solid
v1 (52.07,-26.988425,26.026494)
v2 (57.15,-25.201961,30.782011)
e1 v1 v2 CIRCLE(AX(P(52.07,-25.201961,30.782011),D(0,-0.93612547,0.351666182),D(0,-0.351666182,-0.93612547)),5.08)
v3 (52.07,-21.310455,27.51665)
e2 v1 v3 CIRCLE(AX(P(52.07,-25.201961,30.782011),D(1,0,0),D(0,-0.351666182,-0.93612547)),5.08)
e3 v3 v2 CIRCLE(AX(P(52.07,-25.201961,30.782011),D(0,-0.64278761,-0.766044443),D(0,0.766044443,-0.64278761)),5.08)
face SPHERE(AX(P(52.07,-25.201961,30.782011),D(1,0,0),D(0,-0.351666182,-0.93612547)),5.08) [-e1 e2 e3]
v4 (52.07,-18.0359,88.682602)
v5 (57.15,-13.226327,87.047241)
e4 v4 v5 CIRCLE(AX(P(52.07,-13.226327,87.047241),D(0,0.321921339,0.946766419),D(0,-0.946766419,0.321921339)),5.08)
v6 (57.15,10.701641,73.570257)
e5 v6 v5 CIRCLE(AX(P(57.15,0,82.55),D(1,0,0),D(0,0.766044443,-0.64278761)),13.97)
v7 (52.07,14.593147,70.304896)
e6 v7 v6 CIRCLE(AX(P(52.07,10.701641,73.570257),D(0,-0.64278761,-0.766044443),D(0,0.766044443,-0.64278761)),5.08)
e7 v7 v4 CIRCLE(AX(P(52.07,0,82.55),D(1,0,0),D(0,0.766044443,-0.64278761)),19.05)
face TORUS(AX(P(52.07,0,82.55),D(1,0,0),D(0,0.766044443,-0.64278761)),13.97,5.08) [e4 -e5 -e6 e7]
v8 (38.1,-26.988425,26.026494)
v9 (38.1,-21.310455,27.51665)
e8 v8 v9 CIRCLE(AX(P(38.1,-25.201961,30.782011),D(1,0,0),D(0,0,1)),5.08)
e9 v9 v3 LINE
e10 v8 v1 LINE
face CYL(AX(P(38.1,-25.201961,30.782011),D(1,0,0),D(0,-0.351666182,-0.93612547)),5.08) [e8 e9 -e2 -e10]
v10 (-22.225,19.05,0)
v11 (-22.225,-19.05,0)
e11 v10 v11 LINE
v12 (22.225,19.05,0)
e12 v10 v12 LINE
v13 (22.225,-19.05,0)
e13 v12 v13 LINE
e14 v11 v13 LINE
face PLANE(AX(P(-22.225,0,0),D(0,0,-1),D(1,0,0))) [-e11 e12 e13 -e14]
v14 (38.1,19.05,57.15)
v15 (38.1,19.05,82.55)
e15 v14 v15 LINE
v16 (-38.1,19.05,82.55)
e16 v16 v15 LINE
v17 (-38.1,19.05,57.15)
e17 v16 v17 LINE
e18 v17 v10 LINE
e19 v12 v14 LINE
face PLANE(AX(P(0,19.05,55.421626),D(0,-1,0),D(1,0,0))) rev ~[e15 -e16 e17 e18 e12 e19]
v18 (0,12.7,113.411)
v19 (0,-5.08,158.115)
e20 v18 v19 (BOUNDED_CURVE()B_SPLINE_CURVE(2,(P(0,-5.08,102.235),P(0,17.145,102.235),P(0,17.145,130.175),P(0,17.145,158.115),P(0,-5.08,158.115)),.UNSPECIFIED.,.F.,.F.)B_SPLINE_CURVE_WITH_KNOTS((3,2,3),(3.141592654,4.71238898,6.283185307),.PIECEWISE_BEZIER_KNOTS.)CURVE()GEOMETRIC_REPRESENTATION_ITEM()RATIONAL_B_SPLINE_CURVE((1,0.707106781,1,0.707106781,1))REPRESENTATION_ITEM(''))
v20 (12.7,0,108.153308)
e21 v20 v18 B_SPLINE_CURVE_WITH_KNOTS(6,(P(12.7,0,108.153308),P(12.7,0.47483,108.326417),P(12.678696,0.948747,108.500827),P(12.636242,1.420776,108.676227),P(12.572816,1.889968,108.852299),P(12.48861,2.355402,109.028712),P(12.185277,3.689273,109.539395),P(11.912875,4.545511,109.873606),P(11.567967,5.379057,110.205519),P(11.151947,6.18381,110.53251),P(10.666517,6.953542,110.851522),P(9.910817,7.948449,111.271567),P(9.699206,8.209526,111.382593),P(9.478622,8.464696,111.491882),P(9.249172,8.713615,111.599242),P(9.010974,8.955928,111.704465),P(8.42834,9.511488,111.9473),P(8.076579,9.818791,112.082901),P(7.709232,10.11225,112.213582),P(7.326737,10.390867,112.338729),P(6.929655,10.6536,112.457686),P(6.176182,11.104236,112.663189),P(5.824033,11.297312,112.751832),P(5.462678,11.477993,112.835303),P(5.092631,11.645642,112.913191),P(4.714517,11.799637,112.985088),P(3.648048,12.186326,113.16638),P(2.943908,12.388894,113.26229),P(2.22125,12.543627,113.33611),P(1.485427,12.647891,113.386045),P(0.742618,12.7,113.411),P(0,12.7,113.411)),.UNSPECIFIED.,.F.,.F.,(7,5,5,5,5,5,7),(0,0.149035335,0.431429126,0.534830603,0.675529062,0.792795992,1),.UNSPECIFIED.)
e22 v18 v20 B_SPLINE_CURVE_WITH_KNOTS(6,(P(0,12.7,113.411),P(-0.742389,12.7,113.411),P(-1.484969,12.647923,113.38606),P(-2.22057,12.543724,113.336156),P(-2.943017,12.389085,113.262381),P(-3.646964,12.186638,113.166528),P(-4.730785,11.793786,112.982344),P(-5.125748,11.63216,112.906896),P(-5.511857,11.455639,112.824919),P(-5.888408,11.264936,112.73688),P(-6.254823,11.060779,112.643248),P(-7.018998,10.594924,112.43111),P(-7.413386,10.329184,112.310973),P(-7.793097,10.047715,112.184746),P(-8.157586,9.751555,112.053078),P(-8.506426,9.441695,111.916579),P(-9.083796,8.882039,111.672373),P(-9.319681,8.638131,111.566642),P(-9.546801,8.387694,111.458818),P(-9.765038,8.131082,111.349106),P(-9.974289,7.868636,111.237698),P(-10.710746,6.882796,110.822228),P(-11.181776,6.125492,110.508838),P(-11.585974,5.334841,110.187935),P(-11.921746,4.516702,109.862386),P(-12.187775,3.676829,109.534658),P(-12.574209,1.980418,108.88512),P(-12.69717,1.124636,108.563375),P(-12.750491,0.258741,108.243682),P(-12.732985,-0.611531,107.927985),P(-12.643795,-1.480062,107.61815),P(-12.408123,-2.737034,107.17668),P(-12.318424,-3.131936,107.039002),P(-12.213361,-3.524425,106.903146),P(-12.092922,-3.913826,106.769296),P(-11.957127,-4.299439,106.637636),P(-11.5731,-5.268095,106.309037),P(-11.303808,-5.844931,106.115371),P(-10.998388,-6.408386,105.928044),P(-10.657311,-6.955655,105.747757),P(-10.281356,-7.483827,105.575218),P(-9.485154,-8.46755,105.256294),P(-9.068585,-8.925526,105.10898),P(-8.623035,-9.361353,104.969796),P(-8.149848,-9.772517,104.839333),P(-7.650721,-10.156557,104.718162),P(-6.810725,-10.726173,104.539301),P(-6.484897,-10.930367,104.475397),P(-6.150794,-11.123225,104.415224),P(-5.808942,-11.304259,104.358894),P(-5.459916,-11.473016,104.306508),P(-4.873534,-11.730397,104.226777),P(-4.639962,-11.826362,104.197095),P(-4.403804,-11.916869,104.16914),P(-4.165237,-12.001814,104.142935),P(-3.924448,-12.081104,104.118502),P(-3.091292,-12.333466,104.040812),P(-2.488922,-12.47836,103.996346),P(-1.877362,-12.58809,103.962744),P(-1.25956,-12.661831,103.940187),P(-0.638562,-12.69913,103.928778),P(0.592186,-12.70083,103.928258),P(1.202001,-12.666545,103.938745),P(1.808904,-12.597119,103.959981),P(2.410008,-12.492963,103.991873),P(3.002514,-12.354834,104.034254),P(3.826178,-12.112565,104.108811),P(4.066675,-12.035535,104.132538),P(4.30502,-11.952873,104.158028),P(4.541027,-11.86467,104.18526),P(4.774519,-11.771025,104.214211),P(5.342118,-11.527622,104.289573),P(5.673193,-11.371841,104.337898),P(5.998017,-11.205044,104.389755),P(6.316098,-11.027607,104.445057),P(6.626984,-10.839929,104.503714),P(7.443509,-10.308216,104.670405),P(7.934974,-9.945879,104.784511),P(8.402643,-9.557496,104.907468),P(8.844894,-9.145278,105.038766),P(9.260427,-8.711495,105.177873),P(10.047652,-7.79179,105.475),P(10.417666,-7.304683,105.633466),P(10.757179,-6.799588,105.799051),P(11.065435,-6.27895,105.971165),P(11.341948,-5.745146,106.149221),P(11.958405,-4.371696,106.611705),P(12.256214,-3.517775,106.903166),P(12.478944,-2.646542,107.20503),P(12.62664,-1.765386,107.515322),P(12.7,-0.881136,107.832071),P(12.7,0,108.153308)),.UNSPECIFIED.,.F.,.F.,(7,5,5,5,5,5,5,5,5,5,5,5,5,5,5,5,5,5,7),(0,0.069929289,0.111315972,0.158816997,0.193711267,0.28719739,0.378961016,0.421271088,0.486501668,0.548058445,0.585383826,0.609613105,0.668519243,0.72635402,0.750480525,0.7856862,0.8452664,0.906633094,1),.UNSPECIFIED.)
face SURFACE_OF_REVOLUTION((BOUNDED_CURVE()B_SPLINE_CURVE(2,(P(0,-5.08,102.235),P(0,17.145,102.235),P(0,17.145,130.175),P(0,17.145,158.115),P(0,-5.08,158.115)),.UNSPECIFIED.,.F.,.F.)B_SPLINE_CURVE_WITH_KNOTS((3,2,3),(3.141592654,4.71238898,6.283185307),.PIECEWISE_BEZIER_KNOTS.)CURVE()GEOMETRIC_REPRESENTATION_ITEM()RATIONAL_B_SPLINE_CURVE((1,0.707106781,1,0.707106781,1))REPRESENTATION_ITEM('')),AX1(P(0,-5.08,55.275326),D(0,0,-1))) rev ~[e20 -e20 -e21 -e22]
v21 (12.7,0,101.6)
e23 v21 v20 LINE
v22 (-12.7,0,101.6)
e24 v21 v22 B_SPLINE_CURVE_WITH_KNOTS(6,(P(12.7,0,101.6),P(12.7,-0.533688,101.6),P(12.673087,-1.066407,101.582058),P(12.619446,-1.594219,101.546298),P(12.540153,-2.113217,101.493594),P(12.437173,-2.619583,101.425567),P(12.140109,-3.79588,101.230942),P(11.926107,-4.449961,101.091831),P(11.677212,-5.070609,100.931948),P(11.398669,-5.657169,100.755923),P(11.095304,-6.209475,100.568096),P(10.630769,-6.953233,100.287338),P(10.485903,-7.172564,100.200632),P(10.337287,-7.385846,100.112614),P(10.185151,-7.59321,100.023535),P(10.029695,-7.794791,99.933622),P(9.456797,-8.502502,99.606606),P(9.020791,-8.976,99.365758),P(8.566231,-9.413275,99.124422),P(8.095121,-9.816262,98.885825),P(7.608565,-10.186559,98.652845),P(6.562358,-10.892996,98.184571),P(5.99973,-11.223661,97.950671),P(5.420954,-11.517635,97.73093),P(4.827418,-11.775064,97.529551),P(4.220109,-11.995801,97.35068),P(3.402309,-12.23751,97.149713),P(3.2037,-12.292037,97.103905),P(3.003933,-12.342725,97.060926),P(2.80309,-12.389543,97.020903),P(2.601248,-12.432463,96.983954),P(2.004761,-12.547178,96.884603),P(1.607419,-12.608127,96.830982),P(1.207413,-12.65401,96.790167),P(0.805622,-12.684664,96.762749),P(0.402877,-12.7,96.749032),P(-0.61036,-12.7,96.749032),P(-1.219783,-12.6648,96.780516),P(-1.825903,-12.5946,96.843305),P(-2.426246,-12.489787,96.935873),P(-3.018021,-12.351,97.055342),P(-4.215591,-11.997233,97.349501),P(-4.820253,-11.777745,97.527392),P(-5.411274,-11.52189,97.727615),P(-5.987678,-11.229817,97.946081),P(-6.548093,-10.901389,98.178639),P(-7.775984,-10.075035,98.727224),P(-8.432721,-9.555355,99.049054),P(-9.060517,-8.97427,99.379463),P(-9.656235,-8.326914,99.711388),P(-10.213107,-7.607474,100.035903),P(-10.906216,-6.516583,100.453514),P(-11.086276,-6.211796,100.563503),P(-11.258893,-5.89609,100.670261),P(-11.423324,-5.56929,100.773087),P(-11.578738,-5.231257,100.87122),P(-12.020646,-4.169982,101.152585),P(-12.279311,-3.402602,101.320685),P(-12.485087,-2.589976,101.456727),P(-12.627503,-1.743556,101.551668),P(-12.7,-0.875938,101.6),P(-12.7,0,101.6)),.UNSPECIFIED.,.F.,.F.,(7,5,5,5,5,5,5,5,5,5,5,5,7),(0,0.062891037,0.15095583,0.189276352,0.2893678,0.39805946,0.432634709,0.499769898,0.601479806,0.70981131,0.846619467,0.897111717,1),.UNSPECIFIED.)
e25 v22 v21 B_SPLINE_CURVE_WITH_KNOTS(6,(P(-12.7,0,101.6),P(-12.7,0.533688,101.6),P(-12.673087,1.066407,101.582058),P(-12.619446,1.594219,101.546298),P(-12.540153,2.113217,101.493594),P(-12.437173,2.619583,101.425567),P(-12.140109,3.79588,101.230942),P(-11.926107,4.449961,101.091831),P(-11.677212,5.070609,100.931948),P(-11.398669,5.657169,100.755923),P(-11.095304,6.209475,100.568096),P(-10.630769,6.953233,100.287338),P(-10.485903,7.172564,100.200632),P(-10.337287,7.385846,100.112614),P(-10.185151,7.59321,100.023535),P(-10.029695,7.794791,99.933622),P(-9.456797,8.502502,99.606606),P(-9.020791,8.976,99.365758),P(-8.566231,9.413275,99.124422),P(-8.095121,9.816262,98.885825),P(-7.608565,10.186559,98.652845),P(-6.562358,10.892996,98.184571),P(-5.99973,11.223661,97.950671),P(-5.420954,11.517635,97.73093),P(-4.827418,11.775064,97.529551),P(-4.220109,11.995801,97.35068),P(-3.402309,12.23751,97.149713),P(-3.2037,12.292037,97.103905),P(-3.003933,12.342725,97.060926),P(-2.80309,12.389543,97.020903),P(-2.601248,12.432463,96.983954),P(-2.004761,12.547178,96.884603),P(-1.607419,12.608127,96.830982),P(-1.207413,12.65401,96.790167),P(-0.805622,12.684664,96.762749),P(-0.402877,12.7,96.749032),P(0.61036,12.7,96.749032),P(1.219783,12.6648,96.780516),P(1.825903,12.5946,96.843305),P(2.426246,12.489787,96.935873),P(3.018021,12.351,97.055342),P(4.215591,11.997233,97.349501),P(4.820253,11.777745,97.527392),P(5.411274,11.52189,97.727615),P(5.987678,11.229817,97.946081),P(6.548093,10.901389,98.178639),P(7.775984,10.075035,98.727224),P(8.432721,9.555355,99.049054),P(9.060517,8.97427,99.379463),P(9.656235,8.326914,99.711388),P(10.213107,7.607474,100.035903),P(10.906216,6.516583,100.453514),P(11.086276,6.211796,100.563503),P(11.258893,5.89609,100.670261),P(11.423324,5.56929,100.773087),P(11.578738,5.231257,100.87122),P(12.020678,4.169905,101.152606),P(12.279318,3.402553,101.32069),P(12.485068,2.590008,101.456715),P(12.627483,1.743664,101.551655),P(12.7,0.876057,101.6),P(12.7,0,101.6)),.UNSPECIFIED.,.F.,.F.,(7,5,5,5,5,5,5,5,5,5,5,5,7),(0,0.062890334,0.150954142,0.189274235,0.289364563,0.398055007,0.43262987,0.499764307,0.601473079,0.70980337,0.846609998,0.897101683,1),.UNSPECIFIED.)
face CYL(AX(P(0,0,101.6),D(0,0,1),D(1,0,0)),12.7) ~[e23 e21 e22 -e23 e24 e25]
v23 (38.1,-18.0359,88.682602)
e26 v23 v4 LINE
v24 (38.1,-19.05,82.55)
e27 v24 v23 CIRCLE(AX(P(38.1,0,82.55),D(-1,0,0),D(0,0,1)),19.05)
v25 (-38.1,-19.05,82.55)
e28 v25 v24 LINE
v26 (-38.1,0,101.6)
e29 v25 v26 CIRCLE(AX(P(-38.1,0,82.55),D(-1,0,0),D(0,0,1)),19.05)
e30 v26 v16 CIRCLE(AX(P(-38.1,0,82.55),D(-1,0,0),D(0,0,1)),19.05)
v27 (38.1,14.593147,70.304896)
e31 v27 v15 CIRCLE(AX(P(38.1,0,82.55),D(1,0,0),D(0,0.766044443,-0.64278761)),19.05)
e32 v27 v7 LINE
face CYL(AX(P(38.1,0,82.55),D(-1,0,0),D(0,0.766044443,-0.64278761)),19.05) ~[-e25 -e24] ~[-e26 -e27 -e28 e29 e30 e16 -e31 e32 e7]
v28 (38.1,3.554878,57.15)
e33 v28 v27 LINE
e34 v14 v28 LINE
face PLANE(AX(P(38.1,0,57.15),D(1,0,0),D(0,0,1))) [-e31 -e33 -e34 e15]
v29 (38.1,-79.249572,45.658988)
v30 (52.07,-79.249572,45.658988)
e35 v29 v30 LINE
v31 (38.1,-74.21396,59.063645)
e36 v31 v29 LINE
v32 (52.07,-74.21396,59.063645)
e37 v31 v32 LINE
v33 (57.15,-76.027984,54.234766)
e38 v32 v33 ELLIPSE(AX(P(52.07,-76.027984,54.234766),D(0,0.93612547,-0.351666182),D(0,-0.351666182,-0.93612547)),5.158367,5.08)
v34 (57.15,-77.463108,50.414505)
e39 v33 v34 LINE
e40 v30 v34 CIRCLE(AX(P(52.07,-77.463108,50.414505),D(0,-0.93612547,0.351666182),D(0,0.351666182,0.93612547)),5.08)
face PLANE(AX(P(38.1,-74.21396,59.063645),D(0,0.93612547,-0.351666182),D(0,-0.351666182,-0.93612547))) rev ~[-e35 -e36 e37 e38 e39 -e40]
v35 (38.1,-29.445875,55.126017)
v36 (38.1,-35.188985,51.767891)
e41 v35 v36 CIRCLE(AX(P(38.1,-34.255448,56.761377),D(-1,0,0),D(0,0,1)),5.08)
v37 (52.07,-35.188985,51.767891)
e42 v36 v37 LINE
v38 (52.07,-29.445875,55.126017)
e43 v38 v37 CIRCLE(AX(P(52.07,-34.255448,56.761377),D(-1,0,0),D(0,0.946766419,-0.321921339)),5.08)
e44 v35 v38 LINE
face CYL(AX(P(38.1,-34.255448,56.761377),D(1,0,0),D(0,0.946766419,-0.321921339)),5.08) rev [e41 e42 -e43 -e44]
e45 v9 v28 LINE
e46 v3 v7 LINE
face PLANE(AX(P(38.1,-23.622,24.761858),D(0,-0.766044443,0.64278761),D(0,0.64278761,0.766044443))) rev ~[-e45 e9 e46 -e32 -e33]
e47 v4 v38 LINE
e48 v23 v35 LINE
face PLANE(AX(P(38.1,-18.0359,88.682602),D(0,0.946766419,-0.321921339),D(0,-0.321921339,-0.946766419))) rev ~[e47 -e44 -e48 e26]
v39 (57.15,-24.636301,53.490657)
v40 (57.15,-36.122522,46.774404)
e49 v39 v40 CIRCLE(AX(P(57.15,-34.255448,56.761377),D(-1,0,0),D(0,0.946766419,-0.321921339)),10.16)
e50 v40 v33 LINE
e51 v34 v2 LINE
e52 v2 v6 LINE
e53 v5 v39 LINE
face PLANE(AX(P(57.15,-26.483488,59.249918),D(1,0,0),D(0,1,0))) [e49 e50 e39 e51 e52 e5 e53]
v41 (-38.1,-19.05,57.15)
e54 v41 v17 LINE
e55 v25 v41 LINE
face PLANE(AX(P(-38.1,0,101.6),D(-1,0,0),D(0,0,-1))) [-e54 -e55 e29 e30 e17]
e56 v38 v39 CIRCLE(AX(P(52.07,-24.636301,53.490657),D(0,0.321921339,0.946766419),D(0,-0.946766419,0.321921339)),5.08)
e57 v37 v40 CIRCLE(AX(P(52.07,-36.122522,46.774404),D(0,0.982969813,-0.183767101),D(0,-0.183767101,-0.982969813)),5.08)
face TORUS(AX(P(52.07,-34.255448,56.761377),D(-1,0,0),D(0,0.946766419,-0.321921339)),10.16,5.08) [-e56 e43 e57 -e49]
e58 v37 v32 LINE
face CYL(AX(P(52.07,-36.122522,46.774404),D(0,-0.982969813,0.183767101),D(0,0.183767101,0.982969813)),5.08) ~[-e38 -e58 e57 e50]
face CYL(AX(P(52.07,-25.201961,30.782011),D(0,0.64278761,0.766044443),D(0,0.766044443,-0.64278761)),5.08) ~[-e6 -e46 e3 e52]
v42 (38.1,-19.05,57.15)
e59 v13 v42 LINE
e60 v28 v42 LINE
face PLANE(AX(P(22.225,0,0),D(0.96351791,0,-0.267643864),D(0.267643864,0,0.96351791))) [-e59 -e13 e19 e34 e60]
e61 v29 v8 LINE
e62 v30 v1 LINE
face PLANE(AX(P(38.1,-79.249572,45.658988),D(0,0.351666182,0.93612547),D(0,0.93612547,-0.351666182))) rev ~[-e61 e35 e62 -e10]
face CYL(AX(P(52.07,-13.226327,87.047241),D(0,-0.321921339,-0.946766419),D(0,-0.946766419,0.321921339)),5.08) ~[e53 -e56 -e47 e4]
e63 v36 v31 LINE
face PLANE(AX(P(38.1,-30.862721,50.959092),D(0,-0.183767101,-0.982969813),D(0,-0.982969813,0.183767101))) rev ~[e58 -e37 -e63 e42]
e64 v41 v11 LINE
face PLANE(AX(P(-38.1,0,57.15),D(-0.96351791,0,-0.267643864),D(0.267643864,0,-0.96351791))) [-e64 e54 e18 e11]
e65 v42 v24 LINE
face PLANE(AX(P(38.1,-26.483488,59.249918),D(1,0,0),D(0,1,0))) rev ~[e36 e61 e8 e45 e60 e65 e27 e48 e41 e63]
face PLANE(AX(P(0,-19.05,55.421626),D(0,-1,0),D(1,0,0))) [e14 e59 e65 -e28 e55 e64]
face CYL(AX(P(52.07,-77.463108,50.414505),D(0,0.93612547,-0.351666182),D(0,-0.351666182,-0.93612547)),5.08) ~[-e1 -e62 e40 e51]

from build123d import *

# Parameters (mm, degrees)
F1_DEPTH    = 19.05
F2_T1_DEPTH = 171.45
F3_W        = 12.7
F3_H        = 38.1
F8_DEPTH    = 19.05
F9_R        = 5.08
F10_R       = 5.08
F11_R       = 5.08


# Not quite as in the source:
# - a fillet or chamfer that OpenCascade refuses, or shapes differently, is made with other operations: its cross-section is extruded or revolved along the edge and cut away or added


with BuildPart() as f1:
    # F0 (on Front) → F1 (new body, symmetric)
    with BuildSketch(Plane.XZ):
        Polygon((-38.1, 57.15), (-22.225, 0), (22.225, 0), (38.1, 57.15), (38.1, 101.6), (-38.1, 101.6), align=None)
    extrude(amount=F1_DEPTH, both=True)

    # F2: fillet of radius 19.05 on 2 edges, made by hand

    # F2_s2 → F2_t1 (cut)
    with BuildSketch(Plane.YZ.offset(-85.725)):
        with BuildLine():
            ThreePointArc((0, 101.6), (-13.4703841816, 96.0203841816), (-19.05, 82.55))
            Line((-19.05, 82.55), (-19.05, 101.6))
            Line((-19.05, 101.6), (0, 101.6))
        make_face()
        with BuildLine():
            ThreePointArc((0, 101.6), (13.4703841816, 96.0203841816), (19.05, 82.55))
            Line((19.05, 82.55), (19.05, 101.6))
            Line((19.05, 101.6), (0, 101.6))
        make_face()
    extrude(amount=F2_T1_DEPTH, mode=Mode.SUBTRACT)

    # F3 (on Front) → F4 (revolve)
    with BuildSketch(Plane.XZ):
        with Locations((6.35, 101.6)):
            Rectangle(F3_W, F3_H)
    revolve(axis=Axis((0, 0, 41.275), (0, 0, -1)))

    # F5 (on Right) → F6 (revolve)
    with BuildSketch(Plane.YZ):
        with BuildLine():
            Line((-5.08, 158.115), (-5.08, 102.235))
            add(Edge.make_bspline(
                [(-5.08, 102.235), (17.145, 102.235), (17.145, 130.175), (17.145, 158.115), (-5.08, 158.115)],
                knots=[3.1415926536, 3.1415926536, 3.1415926536, 4.7123889804, 4.7123889804, 6.2831853072, 6.2831853072, 6.2831853072], degree=2, weights=[1, 0.7071067812, 1, 0.7071067812, 1]))
        make_face()
    revolve(axis=Axis((0, -5.08, 55.275326029), (0, 0, -1)))

    # F7 (on face) → F8 (join)
    with BuildSketch(Plane.YZ.offset(38.1)):
        with BuildLine():
            Line((-23.622, 24.761857734), (14.5931466414, 70.3048960355))
            ThreePointArc((14.5931466414, 70.3048960355), (9.3486979196, 99.1483236264), (-18.0359002739, 88.6826015123))
            Line((-18.0359002739, 88.6826015123), (-30.8627206832, 50.9590916336))
            Line((-30.8627206832, 50.9590916336), (-74.213960244, 59.0636453196))
            Line((-74.213960244, 59.0636453196), (-79.2495722325, 45.6589880743))
            Line((-79.2495722325, 45.6589880743), (-23.622, 24.761857734))
        make_face()
    extrude(amount=F8_DEPTH)

    # F9
    f9_edges = [f1.edges().sort_by_distance(p)[0] for p in [
        (47.625, -30.862721, 50.959092),
    ]]
    fillet(f9_edges, radius=F9_R)

    # F10
    f10_edges = [f1.edges().sort_by_distance(p)[0] for p in [
        (47.625, -23.622, 24.761858),
    ]]
    fillet(f10_edges, radius=F10_R)

    # F11
    f11_edges = [f1.edges().sort_by_distance(p)[0] for p in [
        (57.15, -3.358654, 48.910773),
        (57.15, -53.118999, 35.842741),
        (57.15, -23.91241, 25.868412),
        (57.15, -54.701473, 55.415768),
        (57.15, -31.691239, 52.376034),
        (57.15, -23.740888, 71.904309),
        (57.15, 9.348698, 99.148324),
    ]]
    fillet(f11_edges, radius=F11_R)


solid = f1.part
